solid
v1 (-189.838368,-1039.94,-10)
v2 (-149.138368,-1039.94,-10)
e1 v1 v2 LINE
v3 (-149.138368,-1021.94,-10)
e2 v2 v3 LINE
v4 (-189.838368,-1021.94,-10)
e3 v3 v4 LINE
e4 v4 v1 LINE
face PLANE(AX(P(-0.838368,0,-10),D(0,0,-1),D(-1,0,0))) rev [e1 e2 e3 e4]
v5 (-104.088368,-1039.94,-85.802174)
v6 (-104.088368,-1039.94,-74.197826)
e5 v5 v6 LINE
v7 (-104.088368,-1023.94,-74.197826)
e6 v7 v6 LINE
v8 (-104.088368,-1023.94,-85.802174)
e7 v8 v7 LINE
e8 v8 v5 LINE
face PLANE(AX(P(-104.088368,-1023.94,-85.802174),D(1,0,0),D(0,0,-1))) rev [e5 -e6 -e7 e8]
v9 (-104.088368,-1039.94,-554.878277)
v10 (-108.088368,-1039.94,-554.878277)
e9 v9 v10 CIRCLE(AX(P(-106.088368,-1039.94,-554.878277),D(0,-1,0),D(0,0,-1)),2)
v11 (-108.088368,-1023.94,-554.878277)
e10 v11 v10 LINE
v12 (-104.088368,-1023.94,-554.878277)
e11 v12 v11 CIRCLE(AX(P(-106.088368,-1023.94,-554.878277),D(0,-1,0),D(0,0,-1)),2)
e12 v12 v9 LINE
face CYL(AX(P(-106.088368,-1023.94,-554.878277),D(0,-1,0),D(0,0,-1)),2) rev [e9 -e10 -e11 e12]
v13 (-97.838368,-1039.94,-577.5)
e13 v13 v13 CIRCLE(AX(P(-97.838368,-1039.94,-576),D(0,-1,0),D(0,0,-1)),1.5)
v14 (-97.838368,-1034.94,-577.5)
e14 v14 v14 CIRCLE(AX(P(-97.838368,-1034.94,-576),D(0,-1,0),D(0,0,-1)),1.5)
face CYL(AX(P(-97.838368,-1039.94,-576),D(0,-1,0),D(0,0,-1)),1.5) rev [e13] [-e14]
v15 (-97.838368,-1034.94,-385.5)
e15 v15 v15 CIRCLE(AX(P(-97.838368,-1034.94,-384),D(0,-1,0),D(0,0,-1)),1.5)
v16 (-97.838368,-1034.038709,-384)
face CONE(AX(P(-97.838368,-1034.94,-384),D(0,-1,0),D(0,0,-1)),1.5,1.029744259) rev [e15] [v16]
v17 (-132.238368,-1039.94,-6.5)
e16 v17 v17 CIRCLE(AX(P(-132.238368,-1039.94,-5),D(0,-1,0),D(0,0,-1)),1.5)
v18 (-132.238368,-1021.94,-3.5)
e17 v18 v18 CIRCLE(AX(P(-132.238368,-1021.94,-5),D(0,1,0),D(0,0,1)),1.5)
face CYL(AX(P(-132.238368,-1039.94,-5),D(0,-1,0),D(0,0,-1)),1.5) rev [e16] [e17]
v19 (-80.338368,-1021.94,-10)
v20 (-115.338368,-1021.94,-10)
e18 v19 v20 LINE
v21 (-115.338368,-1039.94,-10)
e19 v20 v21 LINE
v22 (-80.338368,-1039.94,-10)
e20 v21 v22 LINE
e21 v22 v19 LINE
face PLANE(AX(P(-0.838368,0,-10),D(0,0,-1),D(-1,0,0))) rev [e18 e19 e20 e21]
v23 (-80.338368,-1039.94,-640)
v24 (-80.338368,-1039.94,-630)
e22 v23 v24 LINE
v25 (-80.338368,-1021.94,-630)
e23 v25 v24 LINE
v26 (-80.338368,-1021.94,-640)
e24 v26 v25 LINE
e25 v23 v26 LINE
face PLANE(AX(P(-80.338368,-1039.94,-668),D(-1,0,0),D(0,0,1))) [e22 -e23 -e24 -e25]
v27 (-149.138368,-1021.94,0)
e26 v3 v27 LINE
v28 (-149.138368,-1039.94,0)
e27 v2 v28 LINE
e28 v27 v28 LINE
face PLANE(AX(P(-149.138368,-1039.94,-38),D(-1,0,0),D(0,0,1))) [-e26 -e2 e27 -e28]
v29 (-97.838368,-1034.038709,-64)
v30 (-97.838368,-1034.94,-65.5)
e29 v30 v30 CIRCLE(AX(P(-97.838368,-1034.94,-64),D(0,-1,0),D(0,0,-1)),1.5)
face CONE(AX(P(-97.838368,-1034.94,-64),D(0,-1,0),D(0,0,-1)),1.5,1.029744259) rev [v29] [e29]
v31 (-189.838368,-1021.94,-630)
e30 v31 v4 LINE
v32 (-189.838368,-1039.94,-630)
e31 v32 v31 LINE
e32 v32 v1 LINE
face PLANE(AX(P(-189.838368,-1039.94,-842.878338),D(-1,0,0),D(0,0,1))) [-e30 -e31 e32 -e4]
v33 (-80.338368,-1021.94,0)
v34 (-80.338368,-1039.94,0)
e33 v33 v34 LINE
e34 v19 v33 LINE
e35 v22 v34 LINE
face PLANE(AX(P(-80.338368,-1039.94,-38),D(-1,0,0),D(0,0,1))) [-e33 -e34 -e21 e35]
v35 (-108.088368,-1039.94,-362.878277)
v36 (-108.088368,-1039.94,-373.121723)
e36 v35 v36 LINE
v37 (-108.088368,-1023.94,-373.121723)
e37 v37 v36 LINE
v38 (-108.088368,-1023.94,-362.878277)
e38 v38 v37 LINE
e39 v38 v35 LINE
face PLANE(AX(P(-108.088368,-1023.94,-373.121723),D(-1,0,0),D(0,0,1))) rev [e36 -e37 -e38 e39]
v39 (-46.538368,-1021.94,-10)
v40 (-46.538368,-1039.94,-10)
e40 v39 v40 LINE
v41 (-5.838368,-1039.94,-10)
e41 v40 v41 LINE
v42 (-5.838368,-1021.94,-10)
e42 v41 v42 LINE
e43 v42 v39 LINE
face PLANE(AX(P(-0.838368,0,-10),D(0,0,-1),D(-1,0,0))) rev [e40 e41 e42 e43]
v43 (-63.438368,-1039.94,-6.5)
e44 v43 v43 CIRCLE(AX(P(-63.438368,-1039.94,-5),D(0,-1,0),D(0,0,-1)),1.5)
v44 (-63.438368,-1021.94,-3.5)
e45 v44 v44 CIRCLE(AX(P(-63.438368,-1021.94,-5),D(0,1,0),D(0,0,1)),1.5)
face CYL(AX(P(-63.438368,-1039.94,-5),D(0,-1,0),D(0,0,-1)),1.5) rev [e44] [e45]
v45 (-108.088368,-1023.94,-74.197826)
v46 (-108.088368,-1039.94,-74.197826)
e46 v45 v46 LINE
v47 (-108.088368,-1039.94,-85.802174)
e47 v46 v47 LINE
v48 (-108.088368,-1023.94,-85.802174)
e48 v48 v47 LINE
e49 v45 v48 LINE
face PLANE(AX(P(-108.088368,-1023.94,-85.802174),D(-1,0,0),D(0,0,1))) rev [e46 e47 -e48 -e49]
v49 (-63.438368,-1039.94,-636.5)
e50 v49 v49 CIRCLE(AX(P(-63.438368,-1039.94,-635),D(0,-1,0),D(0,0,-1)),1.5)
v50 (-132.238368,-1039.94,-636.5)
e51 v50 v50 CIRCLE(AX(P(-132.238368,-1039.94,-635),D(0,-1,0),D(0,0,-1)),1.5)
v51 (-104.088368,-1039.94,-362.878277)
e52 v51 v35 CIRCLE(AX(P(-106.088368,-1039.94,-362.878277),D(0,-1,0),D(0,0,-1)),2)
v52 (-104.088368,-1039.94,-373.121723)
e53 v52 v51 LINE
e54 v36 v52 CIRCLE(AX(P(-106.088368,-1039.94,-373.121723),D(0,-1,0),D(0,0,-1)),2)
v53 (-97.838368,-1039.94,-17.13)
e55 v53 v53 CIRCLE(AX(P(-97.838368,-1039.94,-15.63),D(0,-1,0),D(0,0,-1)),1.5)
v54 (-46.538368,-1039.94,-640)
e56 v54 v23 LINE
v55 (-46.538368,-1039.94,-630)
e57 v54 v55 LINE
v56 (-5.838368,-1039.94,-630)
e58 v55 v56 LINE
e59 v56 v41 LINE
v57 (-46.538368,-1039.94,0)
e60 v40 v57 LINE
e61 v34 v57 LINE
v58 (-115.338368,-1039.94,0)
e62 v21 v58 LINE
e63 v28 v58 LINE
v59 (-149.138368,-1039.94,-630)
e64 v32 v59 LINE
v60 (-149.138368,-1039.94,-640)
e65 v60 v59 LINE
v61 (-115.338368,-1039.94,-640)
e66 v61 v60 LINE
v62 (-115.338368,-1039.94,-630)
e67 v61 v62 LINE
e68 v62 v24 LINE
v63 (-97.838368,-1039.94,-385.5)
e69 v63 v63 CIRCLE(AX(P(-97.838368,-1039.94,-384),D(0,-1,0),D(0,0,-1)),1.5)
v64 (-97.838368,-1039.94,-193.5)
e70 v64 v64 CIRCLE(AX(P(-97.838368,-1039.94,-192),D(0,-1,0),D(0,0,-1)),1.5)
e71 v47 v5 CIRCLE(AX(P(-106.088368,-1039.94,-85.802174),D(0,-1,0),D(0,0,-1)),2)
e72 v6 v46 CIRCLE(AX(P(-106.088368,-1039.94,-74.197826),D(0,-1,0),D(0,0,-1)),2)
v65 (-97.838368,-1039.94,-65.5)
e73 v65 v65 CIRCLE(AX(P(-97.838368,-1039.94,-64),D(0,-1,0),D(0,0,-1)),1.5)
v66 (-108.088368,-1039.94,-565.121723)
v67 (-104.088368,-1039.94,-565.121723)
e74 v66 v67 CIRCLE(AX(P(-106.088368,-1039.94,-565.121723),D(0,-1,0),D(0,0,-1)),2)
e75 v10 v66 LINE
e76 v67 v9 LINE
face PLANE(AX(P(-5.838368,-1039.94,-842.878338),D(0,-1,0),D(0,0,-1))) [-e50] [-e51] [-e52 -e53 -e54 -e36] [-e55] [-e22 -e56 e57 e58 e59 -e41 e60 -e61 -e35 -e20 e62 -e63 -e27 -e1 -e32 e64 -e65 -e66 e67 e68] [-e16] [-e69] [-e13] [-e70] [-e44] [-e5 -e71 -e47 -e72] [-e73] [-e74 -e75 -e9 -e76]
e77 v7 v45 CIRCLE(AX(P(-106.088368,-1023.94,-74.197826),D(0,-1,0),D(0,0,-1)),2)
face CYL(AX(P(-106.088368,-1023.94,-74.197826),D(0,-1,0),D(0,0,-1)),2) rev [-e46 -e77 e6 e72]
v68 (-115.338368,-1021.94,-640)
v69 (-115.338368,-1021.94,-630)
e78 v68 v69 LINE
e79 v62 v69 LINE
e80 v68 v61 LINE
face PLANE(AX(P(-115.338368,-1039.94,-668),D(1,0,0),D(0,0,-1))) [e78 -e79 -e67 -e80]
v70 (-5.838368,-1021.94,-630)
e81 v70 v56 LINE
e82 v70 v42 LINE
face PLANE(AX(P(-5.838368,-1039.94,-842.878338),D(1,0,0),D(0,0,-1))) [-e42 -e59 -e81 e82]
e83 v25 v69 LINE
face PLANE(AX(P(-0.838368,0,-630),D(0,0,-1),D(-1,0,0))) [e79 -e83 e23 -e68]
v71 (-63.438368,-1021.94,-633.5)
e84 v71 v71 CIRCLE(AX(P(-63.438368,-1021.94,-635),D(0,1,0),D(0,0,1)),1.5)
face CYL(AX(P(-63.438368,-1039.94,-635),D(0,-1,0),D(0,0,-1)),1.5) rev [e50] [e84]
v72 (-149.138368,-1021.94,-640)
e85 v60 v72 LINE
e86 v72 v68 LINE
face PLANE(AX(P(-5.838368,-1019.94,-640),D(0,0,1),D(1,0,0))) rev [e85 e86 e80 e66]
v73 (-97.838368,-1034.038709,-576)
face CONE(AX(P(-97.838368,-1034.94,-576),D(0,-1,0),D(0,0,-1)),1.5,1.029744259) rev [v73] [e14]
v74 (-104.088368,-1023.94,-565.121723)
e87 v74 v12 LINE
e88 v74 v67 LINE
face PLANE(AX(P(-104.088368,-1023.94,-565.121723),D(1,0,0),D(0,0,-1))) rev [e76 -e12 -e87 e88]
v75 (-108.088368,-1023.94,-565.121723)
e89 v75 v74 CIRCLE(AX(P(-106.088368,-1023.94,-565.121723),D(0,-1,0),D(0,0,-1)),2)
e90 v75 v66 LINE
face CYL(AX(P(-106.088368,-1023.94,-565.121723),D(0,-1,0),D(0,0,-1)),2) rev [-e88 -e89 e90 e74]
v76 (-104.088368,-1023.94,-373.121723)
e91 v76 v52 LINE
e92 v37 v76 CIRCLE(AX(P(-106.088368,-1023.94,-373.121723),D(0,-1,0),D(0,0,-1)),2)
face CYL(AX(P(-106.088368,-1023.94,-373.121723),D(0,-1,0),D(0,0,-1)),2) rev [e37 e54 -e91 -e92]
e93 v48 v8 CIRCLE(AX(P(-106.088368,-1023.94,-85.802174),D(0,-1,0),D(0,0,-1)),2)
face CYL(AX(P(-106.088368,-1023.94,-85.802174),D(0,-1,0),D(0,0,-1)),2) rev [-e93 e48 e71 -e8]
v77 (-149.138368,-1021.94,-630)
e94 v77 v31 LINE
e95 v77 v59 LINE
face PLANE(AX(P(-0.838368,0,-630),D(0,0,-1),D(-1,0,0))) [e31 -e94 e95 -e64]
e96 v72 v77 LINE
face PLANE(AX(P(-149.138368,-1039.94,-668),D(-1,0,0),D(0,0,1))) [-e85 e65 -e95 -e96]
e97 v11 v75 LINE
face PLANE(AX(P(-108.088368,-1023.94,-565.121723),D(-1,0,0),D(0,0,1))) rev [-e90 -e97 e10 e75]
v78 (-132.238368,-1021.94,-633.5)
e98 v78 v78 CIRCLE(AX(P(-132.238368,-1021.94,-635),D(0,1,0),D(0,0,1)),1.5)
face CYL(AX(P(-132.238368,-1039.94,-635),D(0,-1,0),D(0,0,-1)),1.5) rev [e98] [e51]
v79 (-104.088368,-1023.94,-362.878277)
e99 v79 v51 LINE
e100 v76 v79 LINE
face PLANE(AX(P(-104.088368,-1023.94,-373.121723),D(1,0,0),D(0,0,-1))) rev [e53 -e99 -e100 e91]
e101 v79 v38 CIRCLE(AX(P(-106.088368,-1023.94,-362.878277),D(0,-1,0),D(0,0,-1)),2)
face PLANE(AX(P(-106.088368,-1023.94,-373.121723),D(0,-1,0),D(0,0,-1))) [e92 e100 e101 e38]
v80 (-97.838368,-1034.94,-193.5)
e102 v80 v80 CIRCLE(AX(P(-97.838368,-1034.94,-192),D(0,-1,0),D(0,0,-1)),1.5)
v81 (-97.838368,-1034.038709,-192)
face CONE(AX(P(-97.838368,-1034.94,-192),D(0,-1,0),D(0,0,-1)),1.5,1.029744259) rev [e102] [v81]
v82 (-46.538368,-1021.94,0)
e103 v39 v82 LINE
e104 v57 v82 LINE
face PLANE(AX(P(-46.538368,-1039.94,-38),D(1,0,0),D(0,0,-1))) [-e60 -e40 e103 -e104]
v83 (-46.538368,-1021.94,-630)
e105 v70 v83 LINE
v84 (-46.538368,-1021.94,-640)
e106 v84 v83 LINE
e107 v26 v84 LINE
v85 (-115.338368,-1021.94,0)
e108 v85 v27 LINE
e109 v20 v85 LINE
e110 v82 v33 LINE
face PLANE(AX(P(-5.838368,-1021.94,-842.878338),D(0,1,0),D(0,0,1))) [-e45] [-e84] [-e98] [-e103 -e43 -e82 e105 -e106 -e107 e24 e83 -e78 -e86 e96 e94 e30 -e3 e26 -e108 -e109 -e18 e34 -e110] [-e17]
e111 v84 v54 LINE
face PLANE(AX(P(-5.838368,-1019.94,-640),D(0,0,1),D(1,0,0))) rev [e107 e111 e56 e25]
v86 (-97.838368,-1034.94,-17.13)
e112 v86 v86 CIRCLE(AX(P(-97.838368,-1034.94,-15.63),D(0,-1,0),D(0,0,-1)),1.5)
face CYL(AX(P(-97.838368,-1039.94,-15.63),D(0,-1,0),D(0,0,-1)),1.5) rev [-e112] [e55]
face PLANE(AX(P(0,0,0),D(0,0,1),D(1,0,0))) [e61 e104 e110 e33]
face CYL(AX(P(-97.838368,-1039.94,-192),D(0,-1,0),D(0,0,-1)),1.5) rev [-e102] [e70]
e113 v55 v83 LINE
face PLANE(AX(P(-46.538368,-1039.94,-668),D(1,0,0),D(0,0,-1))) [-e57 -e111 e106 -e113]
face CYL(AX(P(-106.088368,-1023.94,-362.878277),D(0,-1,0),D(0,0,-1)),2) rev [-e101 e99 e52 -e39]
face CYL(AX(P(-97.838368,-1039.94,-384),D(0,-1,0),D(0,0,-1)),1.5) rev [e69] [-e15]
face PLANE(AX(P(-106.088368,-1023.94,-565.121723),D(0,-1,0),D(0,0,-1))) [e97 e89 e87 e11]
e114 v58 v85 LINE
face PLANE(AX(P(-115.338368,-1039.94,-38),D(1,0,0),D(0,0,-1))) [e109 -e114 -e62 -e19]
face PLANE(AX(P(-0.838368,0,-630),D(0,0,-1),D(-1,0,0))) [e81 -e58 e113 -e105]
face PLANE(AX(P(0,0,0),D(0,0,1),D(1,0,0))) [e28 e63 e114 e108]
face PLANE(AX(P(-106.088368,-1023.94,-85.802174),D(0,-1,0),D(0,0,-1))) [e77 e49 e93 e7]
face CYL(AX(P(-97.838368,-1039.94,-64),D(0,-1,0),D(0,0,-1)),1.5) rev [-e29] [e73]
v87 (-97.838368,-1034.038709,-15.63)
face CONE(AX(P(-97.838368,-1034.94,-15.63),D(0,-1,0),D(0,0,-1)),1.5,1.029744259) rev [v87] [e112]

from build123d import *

# Parameters (mm, degrees)
SKETCH1_W                    = 184
SKETCH1_H                    = 18
BOSS_EXTRUDE1_DEPTH          = 658
CAVITY1_START                = -10
CAVITY1_OUTLINE_W            = 35
CAVITY1_OUTLINE_H            = 18
CAVITY1_OUTLINE_R            = 1.5
CAVITY1_OUTLINE_W_2          = 40.7
CAVITY1_DEPTH                = 10
CAVITY2_START                = -640
CAVITY2_OUTLINE_W            = 35
CAVITY2_OUTLINE_H            = 18
CAVITY2_OUTLINE_R            = 1.5
CAVITY2_OUTLINE_W_2          = 40.7
CAVITY2_DEPTH                = 10
SKETCH2_W                    = 184
SKETCH2_H                    = 18
CUT_EXTRUDE1_DEPTH           = 20
F_3_0_3_DIAMETER_HOLE1_D     = 3
F_3_0_3_DIAMETER_HOLE1_DEPTH = 25
F_3_0_3_DIAMETER_HOLE1_TIP   = 0.901290929
SKETCH5_W                    = 15.438081993
SKETCH5_H                    = 17.38610898
SKETCH5_W_2                  = 12.462066187
SKETCH5_W_3                  = 22.69212052
SKETCH5_W_4                  = 24.151046806
SKETCH5_H_2                  = 18.747641983
SKETCH5_W_5                  = 17.028403492
SKETCH5_H_3                  = 21.404849388
SKETCH5_W_6                  = 27.020251182
CUT_EXTRUDE2_DEPTH           = 20
F_3_0_3_DIAMETER_HOLE2_D     = 3
F_3_0_3_DIAMETER_HOLE2_DEPTH = 5
F_3_0_3_DIAMETER_HOLE2_TIP   = 0.901290929
CUT_EXTRUDE3_DEPTH           = 16


# Read off the part's stored shape, not the designer's step: Cavity1, Cavity2
with BuildPart() as part:
    # Sketch1 → Boss-Extrude1 (new body)
    with BuildSketch(Plane.XY):
        with Locations((-97.838367622, -1030.94)):
            Rectangle(SKETCH1_W, SKETCH1_H)
    extrude(amount=-BOSS_EXTRUDE1_DEPTH)

    # Cavity1 outline → Cavity1 (cut)
    # profile 1 of 3: a face of its own
    with BuildSketch(Plane.XY.offset(CAVITY1_START)):
        with Locations((-97.838367622, -1030.94)):
            Rectangle(CAVITY1_OUTLINE_W, CAVITY1_OUTLINE_H)
        with Locations((-97.838367622, -1030.94)):
            Circle(CAVITY1_OUTLINE_R, mode=Mode.SUBTRACT)
    # profile 2 of 3: a face of its own
    with BuildSketch(Plane.XY.offset(CAVITY1_START)):
        with Locations((-169.488367622, -1030.94)):
            Rectangle(CAVITY1_OUTLINE_W_2, CAVITY1_OUTLINE_H)
        with Locations((-169.488367622, -1030.94)):
            Circle(CAVITY1_OUTLINE_R, mode=Mode.SUBTRACT)
    # profile 3 of 3: a face of its own
    with BuildSketch(Plane.XY.offset(CAVITY1_START)):
        with Locations((-26.188367622, -1030.94)):
            Rectangle(CAVITY1_OUTLINE_W_2, CAVITY1_OUTLINE_H)
        with Locations((-26.188367622, -1030.94)):
            Circle(CAVITY1_OUTLINE_R, mode=Mode.SUBTRACT)
    extrude(amount=CAVITY1_DEPTH, mode=Mode.SUBTRACT)

    # Cavity2 outline → Cavity2 (cut)
    # profile 1 of 3: a face of its own
    with BuildSketch(Plane.XY.offset(CAVITY2_START)):
        with Locations((-97.838367622, -1030.94)):
            Rectangle(CAVITY2_OUTLINE_W, CAVITY2_OUTLINE_H)
        with Locations((-97.838367622, -1030.94)):
            Circle(CAVITY2_OUTLINE_R, mode=Mode.SUBTRACT)
    # profile 2 of 3: a face of its own
    with BuildSketch(Plane.XY.offset(CAVITY2_START)):
        with Locations((-169.488367622, -1030.94)):
            Rectangle(CAVITY2_OUTLINE_W_2, CAVITY2_OUTLINE_H)
        with Locations((-169.488367622, -1030.94)):
            Circle(CAVITY2_OUTLINE_R, mode=Mode.SUBTRACT)
    # profile 3 of 3: a face of its own
    with BuildSketch(Plane.XY.offset(CAVITY2_START)):
        with Locations((-26.188367622, -1030.94)):
            Rectangle(CAVITY2_OUTLINE_W_2, CAVITY2_OUTLINE_H)
        with Locations((-26.188367622, -1030.94)):
            Circle(CAVITY2_OUTLINE_R, mode=Mode.SUBTRACT)
    extrude(amount=CAVITY2_DEPTH, mode=Mode.SUBTRACT)

    # Sketch2 → Cut-Extrude1 (cut)
    with BuildSketch(Plane.XZ.offset(1039.94)):
        with Locations((-97.838367622, -649)):
            Rectangle(SKETCH2_W, SKETCH2_H)
    extrude(amount=-CUT_EXTRUDE1_DEPTH, mode=Mode.SUBTRACT)

    # Ø3.0 (3) Diameter Hole1
    with Locations(Plane(origin=(0, -1039.94, 0), x_dir=(-1, 0, 0), z_dir=(0, -1, 0))):
        with Locations((132.238367622, 5), (63.438367622, 5), (63.438367622, 635), (132.238367622, 635)):
            Hole(F_3_0_3_DIAMETER_HOLE1_D / 2, depth=F_3_0_3_DIAMETER_HOLE1_DEPTH)
            with Locations((0, 0, -(F_3_0_3_DIAMETER_HOLE1_DEPTH + F_3_0_3_DIAMETER_HOLE1_TIP / 2))):  # 118° drill point
                Cone(0, F_3_0_3_DIAMETER_HOLE1_D / 2, F_3_0_3_DIAMETER_HOLE1_TIP, mode=Mode.SUBTRACT)

    # Sketch5 → Cut-Extrude2 (cut)
    with BuildSketch(Plane.XZ.offset(1039.94)):
        with Locations((-168.439296688, -638.69305449)):
            Rectangle(SKETCH5_W, SKETCH5_H)
        with Locations((-97.014917346, -638.69305449)):
            Rectangle(SKETCH5_W_2, SKETCH5_H)
        with Locations((-26.055540475, -638.69305449)):
            Rectangle(SKETCH5_W_3, SKETCH5_H)
        with Locations((-172.795779094, -0.626179008)):
            Rectangle(SKETCH5_W_4, SKETCH5_H_2)
        with Locations((-99.298085999, 0.702424694)):
            Rectangle(SKETCH5_W_5, SKETCH5_H_3)
        with Locations((-23.891475144, 0.702424694)):
            Rectangle(SKETCH5_W_6, SKETCH5_H_3)
    extrude(amount=-CUT_EXTRUDE2_DEPTH, mode=Mode.SUBTRACT)

    # Ø3.0 (3) Diameter Hole2
    with Locations(Plane(origin=(0, -1039.94, 0), x_dir=(-1, 0, 0), z_dir=(0, -1, 0))):
        with Locations((97.838367622, 64), (97.838367622, 384), (97.838367622, 576), (97.838367622, 192), (97.838367622, 15.63)):
            Hole(F_3_0_3_DIAMETER_HOLE2_D / 2, depth=F_3_0_3_DIAMETER_HOLE2_DEPTH)
            with Locations((0, 0, -(F_3_0_3_DIAMETER_HOLE2_DEPTH + F_3_0_3_DIAMETER_HOLE2_TIP / 2))):  # 118° drill point
                Cone(0, F_3_0_3_DIAMETER_HOLE2_D / 2, F_3_0_3_DIAMETER_HOLE2_TIP, mode=Mode.SUBTRACT)

    # Sketch8 → Cut-Extrude3 (cut)
    with BuildSketch(Plane.XZ.offset(1039.94)):
        with BuildLine():
            Line((-108.088367622, -85.802173793), (-108.088367622, -74.197826207))
            ThreePointArc((-108.088367622, -74.197826207), (-106.088367622, -72.197826207), (-104.088367622, -74.197826207))
            Line((-104.088367622, -74.197826207), (-104.088367622, -85.802173793))
            ThreePointArc((-104.088367622, -85.802173793), (-106.088367622, -87.802173793), (-108.088367622, -85.802173793))
        make_face()
        with BuildLine():
            Line((-108.088367622, -373.121722836), (-108.088367622, -362.878277164))
            ThreePointArc((-108.088367622, -362.878277164), (-106.088367622, -360.878277164), (-104.088367622, -362.878277164))
            Line((-104.088367622, -362.878277164), (-104.088367622, -373.121722836))
            ThreePointArc((-104.088367622, -373.121722836), (-106.088367622, -375.121722836), (-108.088367622, -373.121722836))
        make_face()
        with BuildLine():
            Line((-108.088367622, -565.121722836), (-108.088367622, -554.878277164))
            ThreePointArc((-108.088367622, -554.878277164), (-106.088367622, -552.878277164), (-104.088367622, -554.878277164))
            Line((-104.088367622, -554.878277164), (-104.088367622, -565.121722836))
            ThreePointArc((-104.088367622, -565.121722836), (-106.088367622, -567.121722836), (-108.088367622, -565.121722836))
        make_face()
    extrude(amount=-CUT_EXTRUDE3_DEPTH, mode=Mode.SUBTRACT)


solid = part.part
